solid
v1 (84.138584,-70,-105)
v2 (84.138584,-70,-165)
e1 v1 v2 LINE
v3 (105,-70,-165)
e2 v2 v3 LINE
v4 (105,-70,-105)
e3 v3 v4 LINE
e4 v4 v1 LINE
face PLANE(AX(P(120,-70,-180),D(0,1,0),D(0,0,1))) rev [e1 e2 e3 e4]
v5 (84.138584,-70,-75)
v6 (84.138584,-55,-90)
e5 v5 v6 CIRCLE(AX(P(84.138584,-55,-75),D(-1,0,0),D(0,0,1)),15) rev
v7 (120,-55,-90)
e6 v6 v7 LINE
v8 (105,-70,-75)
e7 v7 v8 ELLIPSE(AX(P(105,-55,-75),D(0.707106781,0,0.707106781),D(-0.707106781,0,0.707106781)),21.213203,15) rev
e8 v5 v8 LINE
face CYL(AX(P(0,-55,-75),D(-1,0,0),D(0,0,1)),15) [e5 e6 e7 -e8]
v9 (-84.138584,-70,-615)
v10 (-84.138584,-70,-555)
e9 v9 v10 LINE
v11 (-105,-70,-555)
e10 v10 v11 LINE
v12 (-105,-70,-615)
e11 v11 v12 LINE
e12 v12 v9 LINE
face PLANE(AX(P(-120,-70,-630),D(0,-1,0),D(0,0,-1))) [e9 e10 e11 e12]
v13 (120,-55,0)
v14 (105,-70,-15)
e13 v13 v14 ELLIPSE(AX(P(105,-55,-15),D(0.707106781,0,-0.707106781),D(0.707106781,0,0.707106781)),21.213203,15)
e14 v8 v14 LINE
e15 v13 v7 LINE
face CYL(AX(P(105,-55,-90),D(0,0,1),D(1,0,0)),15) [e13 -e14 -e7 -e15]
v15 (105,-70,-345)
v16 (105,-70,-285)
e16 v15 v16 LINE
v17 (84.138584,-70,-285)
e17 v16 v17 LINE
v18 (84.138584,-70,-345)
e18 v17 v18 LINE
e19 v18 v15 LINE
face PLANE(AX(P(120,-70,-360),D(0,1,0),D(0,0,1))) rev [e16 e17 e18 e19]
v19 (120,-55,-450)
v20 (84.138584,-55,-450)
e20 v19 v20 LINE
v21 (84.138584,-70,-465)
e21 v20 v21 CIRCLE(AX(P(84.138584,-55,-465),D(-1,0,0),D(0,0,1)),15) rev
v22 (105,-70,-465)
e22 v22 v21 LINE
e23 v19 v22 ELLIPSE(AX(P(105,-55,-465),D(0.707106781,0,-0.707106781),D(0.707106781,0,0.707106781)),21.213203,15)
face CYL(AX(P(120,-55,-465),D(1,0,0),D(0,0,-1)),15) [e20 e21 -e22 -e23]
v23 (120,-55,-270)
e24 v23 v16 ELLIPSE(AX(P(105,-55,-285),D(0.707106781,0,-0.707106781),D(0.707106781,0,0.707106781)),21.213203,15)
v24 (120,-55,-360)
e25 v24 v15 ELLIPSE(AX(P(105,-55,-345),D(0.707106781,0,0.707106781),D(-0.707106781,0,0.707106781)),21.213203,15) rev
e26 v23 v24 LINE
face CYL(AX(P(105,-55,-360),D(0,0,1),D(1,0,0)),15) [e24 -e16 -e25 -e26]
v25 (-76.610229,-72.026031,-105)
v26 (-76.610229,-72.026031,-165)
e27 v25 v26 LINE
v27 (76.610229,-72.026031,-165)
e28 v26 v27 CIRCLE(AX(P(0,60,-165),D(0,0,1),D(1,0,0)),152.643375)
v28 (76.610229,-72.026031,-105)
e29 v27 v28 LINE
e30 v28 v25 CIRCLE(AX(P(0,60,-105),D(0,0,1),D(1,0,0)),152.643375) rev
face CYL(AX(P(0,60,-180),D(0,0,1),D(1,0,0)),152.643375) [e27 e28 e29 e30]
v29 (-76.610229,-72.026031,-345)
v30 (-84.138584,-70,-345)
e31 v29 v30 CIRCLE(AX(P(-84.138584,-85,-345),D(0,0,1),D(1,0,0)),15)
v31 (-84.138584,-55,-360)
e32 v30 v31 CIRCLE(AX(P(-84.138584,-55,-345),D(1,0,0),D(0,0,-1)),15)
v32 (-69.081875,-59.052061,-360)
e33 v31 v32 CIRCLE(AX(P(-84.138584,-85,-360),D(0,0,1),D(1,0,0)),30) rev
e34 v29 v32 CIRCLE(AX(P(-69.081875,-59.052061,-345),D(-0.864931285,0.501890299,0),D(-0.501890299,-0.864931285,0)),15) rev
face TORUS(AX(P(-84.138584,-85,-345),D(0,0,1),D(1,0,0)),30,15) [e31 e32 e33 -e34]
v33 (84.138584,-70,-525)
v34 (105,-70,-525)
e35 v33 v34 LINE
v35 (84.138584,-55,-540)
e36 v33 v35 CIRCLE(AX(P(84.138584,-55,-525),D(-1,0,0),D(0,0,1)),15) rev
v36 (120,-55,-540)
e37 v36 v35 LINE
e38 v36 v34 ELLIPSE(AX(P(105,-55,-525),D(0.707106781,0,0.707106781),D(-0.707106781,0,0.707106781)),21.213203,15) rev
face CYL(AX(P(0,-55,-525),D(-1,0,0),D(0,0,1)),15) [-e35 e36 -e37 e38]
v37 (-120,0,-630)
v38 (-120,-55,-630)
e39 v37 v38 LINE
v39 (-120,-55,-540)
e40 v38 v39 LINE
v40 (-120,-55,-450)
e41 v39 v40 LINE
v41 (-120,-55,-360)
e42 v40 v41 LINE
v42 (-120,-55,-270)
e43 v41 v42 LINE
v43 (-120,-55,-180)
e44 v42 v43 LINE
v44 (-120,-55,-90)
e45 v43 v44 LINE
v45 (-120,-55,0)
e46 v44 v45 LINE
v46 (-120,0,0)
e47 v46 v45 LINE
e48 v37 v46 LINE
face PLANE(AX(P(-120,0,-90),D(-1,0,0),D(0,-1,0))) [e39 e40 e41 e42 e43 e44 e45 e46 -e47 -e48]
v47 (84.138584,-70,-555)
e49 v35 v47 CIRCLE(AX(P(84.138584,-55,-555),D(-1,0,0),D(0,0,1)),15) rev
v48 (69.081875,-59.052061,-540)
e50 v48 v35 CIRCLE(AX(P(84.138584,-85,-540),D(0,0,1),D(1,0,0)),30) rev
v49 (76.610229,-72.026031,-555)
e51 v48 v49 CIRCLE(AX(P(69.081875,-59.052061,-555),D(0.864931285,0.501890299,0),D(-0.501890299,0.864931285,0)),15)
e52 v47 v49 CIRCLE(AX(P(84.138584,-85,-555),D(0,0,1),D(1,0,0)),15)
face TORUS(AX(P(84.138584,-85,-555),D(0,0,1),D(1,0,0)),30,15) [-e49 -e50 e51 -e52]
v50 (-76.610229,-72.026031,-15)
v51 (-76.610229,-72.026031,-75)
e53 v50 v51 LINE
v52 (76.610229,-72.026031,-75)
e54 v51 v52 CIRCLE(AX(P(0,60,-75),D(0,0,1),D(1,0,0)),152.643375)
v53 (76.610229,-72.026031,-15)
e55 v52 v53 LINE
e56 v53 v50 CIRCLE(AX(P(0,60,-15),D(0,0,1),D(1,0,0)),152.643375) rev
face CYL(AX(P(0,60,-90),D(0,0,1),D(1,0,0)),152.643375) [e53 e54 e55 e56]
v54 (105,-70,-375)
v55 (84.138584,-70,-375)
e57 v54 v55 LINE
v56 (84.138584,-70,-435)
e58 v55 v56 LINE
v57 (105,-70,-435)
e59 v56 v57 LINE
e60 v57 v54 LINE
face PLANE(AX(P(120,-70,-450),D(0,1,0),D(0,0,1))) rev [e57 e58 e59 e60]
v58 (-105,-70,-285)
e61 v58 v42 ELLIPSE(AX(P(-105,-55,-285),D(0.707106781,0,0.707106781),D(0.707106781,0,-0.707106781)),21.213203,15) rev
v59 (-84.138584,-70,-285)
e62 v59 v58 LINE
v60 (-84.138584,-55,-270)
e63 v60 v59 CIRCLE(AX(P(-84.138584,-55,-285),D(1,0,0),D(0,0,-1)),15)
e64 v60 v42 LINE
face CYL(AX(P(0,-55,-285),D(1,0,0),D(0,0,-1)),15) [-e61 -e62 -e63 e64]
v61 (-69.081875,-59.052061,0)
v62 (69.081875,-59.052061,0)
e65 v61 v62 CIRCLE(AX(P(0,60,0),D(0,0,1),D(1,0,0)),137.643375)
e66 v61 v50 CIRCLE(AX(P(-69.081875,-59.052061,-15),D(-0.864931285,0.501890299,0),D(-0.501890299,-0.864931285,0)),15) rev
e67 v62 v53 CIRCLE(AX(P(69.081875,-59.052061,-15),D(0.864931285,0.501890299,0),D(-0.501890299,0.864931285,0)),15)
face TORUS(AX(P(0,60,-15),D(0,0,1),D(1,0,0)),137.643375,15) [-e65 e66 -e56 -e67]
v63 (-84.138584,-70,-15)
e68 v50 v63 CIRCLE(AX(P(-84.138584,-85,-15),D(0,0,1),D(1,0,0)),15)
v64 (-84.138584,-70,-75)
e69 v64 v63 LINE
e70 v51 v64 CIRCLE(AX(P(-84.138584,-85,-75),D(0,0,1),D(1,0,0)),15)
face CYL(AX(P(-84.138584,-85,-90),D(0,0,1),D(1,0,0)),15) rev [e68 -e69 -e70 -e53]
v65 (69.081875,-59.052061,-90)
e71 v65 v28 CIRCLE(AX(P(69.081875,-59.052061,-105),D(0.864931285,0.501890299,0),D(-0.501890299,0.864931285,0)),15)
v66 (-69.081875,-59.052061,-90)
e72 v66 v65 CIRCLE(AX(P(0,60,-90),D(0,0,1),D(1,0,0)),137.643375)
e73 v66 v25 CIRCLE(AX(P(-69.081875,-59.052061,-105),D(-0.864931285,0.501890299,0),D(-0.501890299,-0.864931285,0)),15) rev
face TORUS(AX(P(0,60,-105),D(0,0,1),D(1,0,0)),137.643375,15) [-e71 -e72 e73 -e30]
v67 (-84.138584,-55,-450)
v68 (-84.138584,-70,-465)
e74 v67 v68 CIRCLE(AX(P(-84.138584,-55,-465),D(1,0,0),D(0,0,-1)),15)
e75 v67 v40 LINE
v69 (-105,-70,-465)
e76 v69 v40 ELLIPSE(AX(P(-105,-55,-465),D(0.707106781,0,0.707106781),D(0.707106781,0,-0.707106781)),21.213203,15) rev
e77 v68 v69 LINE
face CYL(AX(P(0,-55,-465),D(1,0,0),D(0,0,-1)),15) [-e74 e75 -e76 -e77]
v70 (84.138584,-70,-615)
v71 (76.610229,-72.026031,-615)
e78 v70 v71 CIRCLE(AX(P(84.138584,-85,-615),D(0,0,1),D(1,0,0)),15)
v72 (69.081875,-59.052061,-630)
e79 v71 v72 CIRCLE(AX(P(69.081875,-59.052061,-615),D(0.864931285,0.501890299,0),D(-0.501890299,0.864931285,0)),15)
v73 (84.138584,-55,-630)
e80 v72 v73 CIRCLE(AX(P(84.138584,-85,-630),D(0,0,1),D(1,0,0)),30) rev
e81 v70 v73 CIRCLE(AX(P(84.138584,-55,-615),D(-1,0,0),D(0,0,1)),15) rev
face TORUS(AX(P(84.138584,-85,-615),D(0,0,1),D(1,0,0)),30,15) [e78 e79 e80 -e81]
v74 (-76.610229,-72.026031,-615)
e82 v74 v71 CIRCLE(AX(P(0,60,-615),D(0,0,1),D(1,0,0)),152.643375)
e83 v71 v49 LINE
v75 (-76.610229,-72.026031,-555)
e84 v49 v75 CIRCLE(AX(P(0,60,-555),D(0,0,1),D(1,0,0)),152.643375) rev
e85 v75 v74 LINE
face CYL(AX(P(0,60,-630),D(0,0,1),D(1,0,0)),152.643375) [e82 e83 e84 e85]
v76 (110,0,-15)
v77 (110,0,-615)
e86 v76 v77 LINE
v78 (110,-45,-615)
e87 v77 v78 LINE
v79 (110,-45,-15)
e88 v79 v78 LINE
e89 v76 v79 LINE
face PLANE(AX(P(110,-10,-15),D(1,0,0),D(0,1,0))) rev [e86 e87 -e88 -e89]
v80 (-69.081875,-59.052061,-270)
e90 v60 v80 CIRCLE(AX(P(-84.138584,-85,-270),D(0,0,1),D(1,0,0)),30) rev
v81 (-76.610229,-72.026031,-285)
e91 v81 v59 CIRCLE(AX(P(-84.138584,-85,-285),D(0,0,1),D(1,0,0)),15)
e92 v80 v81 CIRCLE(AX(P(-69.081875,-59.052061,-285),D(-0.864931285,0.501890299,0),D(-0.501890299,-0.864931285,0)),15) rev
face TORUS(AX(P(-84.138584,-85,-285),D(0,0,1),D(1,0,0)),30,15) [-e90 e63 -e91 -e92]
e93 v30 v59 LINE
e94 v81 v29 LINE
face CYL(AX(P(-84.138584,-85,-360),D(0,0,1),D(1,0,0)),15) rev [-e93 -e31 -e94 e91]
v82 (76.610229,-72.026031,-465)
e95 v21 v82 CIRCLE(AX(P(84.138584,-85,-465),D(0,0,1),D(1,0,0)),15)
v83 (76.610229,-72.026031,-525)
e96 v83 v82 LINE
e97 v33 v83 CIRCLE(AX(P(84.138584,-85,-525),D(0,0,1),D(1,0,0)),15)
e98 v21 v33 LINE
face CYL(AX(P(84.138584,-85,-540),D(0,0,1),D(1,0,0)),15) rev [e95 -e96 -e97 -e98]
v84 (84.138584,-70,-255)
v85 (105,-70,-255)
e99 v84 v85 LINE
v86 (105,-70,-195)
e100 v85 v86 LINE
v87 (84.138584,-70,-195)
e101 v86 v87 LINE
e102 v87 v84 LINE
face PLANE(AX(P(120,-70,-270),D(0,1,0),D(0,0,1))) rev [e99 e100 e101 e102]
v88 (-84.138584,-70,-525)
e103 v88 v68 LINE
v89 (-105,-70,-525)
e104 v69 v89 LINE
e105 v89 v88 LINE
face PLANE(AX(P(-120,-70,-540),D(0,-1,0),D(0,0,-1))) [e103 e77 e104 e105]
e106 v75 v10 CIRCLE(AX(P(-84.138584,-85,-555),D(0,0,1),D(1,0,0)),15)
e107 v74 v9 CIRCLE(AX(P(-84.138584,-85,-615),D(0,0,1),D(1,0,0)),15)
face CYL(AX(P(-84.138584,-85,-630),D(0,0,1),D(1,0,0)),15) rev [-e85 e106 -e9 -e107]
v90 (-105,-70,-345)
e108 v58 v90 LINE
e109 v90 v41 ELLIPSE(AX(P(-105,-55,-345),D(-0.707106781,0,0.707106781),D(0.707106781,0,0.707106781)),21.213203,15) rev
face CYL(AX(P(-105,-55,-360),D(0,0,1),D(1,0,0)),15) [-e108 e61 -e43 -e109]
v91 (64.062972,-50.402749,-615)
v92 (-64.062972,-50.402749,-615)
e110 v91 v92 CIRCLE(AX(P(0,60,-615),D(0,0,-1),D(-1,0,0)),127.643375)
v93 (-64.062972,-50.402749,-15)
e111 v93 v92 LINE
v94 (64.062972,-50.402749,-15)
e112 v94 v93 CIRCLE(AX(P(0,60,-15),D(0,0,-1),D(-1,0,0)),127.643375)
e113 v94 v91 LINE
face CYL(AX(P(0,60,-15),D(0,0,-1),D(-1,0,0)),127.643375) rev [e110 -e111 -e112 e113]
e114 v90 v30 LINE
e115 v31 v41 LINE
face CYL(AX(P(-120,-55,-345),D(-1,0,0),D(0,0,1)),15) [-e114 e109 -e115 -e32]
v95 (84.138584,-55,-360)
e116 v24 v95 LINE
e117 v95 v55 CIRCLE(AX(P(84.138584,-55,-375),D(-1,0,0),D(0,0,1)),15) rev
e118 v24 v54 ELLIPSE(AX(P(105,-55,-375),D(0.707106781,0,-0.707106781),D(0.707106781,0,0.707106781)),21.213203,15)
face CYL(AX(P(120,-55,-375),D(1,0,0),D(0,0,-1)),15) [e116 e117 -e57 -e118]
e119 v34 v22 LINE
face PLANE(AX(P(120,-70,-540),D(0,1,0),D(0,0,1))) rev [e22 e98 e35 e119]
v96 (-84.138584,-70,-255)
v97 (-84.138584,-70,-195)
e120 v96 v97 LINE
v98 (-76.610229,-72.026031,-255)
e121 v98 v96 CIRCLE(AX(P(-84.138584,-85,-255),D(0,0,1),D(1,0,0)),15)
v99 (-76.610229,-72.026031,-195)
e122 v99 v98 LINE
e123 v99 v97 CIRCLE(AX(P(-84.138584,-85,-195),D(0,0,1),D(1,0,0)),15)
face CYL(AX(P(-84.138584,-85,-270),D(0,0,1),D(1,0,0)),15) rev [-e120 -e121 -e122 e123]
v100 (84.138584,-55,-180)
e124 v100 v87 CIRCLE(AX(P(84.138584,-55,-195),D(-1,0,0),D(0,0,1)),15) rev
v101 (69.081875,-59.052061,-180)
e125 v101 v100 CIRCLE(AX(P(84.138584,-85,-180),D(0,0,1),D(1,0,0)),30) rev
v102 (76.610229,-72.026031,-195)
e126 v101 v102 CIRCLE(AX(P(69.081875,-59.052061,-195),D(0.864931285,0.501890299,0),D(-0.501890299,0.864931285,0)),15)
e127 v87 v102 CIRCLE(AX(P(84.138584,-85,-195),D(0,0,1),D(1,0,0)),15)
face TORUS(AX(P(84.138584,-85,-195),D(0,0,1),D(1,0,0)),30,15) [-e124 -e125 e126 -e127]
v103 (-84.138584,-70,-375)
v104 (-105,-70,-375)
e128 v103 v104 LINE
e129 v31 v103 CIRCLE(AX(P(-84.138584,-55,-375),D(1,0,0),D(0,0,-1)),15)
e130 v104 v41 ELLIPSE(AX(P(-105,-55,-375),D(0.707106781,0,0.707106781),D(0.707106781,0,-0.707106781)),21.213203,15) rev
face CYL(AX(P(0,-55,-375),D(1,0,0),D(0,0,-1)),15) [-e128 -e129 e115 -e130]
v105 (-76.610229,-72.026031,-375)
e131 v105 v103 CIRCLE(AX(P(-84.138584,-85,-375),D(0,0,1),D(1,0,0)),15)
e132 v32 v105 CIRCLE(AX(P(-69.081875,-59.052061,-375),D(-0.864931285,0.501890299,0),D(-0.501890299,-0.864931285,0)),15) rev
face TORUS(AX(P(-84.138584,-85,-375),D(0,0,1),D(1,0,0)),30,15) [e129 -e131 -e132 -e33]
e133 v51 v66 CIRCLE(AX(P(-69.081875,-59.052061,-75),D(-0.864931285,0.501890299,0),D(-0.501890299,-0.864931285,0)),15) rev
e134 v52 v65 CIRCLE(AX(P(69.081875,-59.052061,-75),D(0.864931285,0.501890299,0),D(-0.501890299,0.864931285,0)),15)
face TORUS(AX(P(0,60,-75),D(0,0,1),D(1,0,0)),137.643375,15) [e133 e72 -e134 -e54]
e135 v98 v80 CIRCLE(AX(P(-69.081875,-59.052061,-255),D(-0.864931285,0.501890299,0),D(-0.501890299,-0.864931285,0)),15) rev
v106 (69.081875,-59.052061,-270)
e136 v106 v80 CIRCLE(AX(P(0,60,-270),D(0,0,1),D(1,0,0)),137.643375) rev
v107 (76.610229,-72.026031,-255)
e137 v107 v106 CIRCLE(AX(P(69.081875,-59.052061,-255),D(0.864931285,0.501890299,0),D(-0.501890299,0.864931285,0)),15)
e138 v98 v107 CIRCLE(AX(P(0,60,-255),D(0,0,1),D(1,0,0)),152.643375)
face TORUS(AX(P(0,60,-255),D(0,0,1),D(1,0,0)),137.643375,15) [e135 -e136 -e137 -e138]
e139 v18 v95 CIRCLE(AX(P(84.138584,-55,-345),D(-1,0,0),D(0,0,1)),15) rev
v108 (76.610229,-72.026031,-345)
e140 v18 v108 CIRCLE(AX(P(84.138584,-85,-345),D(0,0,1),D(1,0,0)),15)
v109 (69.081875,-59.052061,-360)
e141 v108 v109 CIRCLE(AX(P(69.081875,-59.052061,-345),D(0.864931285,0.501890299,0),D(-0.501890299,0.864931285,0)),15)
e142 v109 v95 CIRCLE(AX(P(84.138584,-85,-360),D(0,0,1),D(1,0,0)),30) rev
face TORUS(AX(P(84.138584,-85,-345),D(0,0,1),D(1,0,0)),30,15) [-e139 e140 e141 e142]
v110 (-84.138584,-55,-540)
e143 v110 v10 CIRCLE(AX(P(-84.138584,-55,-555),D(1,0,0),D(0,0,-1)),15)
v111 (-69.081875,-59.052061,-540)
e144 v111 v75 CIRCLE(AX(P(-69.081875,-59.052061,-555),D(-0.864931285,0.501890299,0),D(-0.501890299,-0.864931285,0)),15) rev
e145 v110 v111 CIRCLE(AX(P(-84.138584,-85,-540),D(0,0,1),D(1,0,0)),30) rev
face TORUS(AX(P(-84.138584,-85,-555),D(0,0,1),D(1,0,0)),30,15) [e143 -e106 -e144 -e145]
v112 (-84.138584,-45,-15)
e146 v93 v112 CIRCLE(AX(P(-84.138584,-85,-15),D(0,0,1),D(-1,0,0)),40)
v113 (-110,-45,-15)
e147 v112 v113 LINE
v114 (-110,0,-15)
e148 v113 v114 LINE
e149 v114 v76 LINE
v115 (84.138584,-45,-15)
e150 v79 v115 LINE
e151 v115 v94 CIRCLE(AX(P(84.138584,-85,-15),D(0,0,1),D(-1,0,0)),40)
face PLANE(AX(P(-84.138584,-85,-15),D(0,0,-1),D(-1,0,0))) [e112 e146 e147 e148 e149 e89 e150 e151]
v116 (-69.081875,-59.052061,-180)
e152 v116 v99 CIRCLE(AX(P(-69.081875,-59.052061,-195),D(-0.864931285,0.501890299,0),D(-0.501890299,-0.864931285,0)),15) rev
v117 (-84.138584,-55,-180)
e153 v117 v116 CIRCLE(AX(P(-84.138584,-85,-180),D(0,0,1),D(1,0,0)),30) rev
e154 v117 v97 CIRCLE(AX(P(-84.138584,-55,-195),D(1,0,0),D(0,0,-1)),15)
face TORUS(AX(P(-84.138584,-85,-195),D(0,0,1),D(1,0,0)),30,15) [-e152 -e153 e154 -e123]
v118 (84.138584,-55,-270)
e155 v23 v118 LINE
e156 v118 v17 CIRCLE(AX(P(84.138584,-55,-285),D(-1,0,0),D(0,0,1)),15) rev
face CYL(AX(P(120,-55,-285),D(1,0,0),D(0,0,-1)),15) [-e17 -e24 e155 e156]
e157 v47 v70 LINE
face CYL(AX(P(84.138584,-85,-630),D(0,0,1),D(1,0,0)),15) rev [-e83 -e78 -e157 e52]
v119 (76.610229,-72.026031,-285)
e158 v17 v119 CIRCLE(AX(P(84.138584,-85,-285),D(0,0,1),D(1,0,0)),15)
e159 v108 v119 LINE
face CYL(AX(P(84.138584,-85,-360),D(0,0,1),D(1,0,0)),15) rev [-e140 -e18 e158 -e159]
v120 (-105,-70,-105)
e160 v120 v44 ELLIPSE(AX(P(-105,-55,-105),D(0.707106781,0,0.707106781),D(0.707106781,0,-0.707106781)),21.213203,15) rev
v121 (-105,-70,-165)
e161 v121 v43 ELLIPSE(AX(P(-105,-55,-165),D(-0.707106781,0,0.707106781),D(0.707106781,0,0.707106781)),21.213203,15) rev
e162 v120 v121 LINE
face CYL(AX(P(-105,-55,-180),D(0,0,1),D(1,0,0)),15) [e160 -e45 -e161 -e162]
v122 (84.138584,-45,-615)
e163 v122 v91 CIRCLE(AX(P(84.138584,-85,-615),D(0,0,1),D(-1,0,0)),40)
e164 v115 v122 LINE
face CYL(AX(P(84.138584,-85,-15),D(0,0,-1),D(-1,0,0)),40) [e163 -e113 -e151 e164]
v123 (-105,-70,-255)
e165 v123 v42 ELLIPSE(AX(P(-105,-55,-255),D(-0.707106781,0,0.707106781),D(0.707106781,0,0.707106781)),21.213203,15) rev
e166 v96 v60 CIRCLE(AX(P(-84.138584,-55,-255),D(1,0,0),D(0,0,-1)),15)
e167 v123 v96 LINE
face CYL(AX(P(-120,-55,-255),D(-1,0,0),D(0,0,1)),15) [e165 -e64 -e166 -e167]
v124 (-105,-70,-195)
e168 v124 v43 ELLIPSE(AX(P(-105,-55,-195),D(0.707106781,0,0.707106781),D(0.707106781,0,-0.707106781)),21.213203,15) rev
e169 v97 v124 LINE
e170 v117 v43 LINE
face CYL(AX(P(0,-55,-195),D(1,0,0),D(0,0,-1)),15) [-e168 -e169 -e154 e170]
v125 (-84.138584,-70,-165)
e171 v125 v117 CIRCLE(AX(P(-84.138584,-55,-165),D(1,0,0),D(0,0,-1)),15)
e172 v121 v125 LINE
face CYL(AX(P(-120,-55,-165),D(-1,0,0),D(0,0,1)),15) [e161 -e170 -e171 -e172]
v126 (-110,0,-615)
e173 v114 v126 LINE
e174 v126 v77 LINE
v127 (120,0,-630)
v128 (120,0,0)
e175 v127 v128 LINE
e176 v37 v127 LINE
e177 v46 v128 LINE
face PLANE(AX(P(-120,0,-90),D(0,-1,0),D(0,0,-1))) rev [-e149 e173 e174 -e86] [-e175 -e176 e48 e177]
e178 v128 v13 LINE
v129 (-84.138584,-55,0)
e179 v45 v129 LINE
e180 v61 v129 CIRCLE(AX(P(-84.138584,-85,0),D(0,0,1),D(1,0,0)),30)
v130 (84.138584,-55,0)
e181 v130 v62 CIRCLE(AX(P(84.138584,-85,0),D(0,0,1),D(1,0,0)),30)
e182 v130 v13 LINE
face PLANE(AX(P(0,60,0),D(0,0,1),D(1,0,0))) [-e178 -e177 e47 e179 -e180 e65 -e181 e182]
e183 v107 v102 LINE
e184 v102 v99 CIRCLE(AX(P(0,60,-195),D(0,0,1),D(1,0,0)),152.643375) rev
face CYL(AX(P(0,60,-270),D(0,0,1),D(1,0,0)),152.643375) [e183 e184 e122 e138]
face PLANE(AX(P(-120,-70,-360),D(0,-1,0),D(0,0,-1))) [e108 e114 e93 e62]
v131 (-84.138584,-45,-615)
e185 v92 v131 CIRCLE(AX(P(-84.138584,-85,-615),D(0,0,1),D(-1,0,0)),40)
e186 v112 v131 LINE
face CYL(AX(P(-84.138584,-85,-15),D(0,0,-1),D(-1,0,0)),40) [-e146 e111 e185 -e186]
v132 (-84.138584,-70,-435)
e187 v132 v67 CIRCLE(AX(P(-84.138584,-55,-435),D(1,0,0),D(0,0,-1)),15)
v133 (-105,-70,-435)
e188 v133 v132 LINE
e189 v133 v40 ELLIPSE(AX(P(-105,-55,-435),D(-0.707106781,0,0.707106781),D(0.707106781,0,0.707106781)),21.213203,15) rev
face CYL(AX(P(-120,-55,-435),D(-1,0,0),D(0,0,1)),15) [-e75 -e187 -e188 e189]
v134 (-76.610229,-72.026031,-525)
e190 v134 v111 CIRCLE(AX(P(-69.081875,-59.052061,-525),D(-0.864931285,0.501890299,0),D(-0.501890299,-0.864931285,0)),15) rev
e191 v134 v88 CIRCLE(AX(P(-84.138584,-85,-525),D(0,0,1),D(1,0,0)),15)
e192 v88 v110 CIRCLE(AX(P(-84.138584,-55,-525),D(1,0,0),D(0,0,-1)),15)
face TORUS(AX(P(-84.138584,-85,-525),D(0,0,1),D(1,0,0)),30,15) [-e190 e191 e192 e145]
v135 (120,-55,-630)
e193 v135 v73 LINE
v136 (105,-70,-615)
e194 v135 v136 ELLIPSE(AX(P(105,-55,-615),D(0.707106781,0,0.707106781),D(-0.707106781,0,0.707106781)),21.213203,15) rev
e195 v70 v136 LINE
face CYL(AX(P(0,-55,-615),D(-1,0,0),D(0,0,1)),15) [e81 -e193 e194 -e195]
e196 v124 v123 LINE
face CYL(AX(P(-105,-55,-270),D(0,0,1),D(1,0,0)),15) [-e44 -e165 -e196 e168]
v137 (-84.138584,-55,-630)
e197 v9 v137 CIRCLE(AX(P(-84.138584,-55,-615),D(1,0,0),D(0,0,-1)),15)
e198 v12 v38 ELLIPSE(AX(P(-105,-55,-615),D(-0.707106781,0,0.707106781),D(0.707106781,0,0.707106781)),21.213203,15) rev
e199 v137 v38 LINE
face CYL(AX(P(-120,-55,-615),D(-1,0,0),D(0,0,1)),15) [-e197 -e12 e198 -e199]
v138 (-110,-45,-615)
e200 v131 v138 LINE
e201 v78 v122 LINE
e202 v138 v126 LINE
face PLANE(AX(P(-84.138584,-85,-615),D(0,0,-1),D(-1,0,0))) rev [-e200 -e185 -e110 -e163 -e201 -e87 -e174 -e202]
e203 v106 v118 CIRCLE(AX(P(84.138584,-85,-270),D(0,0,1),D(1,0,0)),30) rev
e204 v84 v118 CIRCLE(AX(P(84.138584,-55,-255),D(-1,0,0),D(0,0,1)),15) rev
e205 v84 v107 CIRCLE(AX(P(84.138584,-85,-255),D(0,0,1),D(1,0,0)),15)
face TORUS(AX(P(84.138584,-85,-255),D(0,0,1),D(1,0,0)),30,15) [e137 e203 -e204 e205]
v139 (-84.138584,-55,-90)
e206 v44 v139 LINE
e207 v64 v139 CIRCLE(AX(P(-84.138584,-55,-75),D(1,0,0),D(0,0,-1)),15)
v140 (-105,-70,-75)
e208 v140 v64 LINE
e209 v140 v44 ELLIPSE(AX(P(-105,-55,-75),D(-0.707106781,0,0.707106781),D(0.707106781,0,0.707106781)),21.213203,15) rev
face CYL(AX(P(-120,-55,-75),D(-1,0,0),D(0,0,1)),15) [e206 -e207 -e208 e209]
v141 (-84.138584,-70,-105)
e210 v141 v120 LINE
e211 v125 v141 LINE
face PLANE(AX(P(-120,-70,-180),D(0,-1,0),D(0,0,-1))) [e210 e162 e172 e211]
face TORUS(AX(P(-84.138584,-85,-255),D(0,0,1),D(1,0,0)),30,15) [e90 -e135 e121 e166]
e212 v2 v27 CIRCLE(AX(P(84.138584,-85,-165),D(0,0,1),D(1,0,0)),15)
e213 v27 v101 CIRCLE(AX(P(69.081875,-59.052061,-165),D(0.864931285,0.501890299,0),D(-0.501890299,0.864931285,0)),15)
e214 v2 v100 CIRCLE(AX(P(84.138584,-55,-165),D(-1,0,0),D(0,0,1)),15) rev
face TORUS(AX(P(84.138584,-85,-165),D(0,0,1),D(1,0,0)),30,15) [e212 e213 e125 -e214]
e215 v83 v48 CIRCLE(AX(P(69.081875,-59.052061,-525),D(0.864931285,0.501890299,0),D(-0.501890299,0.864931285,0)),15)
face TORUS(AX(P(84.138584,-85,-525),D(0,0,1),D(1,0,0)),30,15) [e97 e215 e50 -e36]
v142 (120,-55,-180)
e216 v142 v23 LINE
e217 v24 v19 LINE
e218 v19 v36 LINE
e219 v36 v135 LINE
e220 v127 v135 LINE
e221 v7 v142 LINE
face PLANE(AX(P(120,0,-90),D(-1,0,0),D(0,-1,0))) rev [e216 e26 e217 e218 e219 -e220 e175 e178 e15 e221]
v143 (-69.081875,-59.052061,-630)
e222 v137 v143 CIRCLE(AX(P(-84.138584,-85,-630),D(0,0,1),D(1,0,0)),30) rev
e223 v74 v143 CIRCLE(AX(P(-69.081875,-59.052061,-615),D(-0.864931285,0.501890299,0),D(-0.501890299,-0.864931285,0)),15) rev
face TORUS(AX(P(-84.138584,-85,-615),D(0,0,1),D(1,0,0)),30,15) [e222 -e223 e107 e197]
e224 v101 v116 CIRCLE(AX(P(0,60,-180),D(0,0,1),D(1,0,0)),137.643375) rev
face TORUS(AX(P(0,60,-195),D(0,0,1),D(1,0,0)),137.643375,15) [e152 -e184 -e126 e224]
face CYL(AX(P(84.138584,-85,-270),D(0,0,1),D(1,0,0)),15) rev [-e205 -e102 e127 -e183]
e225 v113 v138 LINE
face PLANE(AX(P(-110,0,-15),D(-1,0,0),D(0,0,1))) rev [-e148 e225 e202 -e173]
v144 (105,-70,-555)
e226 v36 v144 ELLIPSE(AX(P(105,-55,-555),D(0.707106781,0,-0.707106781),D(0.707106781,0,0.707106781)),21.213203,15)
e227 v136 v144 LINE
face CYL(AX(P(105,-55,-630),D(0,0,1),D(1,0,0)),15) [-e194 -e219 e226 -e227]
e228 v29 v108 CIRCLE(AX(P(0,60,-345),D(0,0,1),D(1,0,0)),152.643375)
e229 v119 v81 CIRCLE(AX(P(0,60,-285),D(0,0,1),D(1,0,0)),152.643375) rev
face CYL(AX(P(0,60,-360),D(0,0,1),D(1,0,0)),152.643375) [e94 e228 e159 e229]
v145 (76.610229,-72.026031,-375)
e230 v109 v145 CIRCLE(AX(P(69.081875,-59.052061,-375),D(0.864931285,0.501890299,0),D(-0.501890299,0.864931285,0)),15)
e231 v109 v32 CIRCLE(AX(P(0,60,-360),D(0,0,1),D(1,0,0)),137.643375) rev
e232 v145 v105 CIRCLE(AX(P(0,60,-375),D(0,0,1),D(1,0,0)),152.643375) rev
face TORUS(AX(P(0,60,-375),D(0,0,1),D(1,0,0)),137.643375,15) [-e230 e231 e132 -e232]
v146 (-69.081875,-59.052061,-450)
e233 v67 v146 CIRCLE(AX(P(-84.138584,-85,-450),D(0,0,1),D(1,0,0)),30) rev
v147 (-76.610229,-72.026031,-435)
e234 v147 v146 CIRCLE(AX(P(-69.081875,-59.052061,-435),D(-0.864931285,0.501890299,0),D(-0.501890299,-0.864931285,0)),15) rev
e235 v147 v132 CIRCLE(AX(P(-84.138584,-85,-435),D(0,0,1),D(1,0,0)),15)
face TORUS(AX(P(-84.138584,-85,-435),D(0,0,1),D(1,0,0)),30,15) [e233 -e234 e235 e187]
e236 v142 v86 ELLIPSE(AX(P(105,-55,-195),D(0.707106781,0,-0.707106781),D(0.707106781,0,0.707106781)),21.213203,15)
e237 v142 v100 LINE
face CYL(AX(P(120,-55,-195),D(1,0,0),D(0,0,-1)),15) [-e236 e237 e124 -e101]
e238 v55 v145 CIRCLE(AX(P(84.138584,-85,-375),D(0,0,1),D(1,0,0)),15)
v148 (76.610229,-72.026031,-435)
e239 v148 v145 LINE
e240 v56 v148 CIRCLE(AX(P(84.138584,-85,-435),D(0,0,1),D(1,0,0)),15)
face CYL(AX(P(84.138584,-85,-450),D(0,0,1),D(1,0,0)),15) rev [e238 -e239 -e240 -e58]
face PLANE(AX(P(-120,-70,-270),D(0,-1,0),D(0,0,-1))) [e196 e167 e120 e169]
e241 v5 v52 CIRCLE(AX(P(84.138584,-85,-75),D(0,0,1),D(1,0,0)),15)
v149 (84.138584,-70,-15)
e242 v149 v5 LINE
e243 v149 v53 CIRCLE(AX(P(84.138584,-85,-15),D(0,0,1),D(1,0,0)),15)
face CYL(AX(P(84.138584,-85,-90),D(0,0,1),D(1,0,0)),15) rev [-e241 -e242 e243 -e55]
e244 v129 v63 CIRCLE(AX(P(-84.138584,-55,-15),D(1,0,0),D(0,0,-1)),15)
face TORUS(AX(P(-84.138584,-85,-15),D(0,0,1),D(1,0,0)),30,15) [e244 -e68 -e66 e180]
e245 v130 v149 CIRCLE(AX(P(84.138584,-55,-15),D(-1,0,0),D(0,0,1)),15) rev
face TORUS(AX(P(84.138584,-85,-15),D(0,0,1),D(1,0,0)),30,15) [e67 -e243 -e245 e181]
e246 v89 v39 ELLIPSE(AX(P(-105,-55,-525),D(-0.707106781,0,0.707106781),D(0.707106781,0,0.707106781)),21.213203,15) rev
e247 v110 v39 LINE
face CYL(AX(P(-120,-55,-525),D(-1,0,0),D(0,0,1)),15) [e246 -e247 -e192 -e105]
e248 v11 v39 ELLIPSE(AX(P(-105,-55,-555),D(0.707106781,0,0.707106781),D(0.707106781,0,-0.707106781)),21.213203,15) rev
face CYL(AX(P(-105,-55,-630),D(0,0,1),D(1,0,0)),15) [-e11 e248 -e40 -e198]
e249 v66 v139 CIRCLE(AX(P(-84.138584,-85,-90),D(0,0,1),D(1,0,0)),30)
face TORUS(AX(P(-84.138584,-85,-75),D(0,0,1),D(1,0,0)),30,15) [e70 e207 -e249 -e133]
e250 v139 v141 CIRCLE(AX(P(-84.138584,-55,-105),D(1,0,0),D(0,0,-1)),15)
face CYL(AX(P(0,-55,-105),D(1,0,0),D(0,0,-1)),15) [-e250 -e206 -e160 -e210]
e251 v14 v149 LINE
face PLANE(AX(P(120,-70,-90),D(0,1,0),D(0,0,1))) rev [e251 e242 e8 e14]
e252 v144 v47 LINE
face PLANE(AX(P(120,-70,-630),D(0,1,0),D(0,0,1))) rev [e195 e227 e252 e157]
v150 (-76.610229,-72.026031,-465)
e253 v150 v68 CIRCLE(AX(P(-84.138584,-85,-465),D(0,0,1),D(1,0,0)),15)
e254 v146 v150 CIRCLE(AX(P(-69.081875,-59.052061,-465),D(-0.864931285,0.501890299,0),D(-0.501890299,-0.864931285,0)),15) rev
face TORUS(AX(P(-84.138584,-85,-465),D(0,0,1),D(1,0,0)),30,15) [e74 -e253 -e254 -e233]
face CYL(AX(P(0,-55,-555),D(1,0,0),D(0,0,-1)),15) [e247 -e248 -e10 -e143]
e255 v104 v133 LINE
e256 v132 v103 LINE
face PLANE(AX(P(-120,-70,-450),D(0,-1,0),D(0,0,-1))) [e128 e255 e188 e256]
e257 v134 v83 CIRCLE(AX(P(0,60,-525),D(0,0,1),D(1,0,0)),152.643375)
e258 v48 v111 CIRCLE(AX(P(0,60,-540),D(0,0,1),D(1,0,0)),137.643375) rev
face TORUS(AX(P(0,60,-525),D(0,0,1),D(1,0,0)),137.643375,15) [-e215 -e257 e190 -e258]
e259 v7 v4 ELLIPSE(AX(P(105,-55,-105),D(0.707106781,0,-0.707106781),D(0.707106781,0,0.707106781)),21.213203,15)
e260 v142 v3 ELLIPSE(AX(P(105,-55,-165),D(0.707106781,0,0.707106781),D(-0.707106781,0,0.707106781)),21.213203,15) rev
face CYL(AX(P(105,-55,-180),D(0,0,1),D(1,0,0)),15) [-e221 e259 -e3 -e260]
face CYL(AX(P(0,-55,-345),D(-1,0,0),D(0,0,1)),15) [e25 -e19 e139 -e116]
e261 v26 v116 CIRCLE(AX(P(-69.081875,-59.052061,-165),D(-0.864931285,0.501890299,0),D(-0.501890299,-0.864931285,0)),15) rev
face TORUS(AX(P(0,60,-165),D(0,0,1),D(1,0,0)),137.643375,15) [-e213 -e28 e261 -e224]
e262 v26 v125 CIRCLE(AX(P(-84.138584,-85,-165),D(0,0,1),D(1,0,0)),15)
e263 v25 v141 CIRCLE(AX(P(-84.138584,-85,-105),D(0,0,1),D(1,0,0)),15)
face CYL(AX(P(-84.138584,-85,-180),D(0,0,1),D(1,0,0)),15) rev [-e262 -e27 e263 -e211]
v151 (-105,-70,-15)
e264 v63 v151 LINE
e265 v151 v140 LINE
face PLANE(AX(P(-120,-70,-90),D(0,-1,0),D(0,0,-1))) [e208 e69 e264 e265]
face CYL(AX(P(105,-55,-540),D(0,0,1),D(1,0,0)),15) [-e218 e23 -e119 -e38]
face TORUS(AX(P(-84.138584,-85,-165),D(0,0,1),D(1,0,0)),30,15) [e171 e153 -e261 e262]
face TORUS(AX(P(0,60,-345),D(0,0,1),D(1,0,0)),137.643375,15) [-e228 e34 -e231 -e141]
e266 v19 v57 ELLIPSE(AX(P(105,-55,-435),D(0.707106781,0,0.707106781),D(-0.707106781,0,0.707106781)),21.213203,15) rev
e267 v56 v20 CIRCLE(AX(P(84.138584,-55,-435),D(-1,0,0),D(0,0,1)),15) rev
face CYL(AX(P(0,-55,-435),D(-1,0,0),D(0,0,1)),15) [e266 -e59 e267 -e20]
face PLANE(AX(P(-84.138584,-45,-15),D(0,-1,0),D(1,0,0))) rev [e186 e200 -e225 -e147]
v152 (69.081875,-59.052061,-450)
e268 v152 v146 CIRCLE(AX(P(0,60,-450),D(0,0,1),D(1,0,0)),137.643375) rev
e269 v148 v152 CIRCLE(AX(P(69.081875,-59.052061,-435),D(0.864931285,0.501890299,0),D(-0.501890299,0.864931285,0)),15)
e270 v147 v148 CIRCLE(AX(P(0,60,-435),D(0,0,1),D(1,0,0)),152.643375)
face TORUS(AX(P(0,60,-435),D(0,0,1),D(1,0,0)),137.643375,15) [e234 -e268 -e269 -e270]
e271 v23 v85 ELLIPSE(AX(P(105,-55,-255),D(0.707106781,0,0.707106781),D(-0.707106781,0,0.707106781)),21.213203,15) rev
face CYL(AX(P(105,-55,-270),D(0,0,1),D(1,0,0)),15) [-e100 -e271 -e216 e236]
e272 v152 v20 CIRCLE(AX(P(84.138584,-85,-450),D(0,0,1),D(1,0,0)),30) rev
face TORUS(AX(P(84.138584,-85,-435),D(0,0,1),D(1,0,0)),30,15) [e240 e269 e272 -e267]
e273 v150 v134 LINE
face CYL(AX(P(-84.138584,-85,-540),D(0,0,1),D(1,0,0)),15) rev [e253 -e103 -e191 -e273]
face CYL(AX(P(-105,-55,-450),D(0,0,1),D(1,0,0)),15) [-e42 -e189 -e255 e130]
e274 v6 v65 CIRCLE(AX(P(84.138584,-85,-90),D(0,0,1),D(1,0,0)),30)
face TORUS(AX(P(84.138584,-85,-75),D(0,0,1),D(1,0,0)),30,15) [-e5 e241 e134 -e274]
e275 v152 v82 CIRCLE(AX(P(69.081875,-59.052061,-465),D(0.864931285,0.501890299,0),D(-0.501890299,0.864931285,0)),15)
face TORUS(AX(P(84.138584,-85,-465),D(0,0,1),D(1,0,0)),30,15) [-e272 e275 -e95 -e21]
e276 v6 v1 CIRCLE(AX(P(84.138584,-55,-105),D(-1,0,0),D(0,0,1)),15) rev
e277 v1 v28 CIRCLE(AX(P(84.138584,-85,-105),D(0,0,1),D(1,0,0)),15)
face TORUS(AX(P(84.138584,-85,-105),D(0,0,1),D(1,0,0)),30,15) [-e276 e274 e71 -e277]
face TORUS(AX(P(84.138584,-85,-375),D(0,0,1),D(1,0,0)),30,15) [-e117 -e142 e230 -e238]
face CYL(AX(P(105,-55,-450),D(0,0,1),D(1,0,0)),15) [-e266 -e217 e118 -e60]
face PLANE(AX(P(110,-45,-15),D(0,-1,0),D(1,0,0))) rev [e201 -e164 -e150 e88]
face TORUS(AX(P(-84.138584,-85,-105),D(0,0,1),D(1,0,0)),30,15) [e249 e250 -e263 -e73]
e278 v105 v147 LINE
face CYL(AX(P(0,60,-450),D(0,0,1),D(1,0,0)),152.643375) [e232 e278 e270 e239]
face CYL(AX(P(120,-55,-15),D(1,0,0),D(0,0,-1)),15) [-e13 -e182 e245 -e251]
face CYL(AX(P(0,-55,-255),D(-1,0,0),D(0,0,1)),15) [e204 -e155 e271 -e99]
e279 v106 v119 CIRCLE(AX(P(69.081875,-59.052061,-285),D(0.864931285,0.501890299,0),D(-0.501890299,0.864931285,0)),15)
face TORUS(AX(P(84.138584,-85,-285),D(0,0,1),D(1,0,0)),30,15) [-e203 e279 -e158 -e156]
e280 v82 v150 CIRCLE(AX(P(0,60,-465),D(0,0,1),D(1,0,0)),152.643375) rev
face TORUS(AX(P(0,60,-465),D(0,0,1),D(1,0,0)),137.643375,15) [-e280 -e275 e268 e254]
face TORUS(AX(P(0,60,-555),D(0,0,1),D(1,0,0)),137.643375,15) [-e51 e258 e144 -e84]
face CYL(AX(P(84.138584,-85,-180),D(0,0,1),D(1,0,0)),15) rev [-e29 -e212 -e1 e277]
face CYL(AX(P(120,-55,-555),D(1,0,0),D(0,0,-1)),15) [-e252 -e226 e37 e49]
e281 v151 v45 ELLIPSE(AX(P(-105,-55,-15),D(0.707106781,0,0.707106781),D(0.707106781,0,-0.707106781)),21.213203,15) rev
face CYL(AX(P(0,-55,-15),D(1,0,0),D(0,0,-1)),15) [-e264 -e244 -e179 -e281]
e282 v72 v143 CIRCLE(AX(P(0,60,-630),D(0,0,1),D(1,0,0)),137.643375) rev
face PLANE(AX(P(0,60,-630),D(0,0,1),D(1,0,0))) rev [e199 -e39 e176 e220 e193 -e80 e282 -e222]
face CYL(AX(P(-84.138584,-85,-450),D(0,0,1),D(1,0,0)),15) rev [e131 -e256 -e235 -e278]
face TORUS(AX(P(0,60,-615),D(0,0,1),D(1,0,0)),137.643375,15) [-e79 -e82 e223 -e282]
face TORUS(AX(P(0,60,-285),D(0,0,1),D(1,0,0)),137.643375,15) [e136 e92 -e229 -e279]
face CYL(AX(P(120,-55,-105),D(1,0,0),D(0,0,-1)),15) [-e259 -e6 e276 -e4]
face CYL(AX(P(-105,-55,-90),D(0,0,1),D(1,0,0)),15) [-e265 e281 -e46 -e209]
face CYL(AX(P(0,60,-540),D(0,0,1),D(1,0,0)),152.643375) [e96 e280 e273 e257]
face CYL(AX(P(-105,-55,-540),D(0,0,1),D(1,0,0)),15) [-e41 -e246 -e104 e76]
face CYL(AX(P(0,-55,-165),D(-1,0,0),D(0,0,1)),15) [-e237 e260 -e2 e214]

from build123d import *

# Parameters (mm, degrees)
BOSS_EXTRUDE1_DEPTH = 90
FILLET1_R           = 15
CUT_EXTRUDE1_START  = -15
CUT_EXTRUDE1_DEPTH  = 600


with BuildPart() as part:
    # Sketch1 → Boss-Extrude1 (new body)
    with BuildSketch(Plane.XY):
        with BuildLine():
            Line((-120, 0), (120, 0))
            Line((120, 0), (120, -70))
            Line((120, -70), (80, -70))
            ThreePointArc((80, -70), (0, -92.643375225), (-80, -70))
            Line((-80, -70), (-120, -70))
            Line((-120, -70), (-120, 0))
        make_face()
    extrude(amount=-BOSS_EXTRUDE1_DEPTH)

    # Fillet1
    fillet1_edges = [part.edges().sort_by_distance(p)[0] for p in [
        (-120, -70, -45),
        (-80, -70, -45),
        (80, -70, -45),
        (120, -70, -45),
        (100, -70, -90),
        (0, -92.643375225, -90),
        (-100, -70, -90),
        (-100, -70, 0),
        (0, -92.643375225, 0),
        (100, -70, 0),
    ]]
    fillet(fillet1_edges, radius=FILLET1_R)


with BuildPart() as body_2:
    # Body-Move/Copy1: read off the stored shape, not the designer's step
    # Body-Move/Copy1: copy of part
    add(part.part.moved(Location((0, 0, -540))))


with BuildPart() as body_3:
    # Body-Move_Copy1 2: copy of part
    add(part.part.moved(Location((0, 0, -450))))


with BuildPart() as body_4:
    # Body-Move_Copy1 3: copy of part
    add(part.part.moved(Location((0, 0, -360))))


with BuildPart() as body_5:
    # Body-Move_Copy1 4: copy of part
    add(part.part.moved(Location((0, 0, -270))))


with BuildPart() as body_6:
    # Body-Move_Copy1 5: copy of part
    add(part.part.moved(Location((0, 0, -180))))


with BuildPart() as body_7:
    # Body-Move_Copy1 6: copy of part
    add(part.part.moved(Location((0, 0, -90))))


with BuildPart() as part_1:
    add(part.part)

    # Combine1: union body 7, body 6, body 5, body 4, body 3, body 2
    add(body_7.part)
    add(body_6.part)
    add(body_5.part)
    add(body_4.part)
    add(body_3.part)
    add(body_2.part)

    # Sketch2 → Cut-Extrude1 (cut)
    with BuildSketch(Plane(origin=(0, 0, -630), x_dir=(-1, 0, 0), z_dir=(0, 0, -1)).offset(CUT_EXTRUDE1_START)):
        with BuildLine():
            Line((-110, -10), (-110, 0))
            Line((-110, 0), (110, 0))
            Line((110, 0), (110, -10))
            Line((110, -10), (110, -45))
            Line((110, -45), (84.138583639, -45))
            ThreePointArc((84.138583639, -45), (73.743634299, -46.374295758), (64.062971697, -50.402748589))
            ThreePointArc((64.062971697, -50.402748589), (0, -67.643375225), (-64.062971697, -50.402748589))
            ThreePointArc((-64.062971697, -50.402748589), (-73.743634299, -46.374295758), (-84.138583639, -45))
            Line((-84.138583639, -45), (-110, -45))
            Line((-110, -45), (-110, -10))
        make_face()
    extrude(amount=-CUT_EXTRUDE1_DEPTH, mode=Mode.SUBTRACT)


solid = part_1.part
